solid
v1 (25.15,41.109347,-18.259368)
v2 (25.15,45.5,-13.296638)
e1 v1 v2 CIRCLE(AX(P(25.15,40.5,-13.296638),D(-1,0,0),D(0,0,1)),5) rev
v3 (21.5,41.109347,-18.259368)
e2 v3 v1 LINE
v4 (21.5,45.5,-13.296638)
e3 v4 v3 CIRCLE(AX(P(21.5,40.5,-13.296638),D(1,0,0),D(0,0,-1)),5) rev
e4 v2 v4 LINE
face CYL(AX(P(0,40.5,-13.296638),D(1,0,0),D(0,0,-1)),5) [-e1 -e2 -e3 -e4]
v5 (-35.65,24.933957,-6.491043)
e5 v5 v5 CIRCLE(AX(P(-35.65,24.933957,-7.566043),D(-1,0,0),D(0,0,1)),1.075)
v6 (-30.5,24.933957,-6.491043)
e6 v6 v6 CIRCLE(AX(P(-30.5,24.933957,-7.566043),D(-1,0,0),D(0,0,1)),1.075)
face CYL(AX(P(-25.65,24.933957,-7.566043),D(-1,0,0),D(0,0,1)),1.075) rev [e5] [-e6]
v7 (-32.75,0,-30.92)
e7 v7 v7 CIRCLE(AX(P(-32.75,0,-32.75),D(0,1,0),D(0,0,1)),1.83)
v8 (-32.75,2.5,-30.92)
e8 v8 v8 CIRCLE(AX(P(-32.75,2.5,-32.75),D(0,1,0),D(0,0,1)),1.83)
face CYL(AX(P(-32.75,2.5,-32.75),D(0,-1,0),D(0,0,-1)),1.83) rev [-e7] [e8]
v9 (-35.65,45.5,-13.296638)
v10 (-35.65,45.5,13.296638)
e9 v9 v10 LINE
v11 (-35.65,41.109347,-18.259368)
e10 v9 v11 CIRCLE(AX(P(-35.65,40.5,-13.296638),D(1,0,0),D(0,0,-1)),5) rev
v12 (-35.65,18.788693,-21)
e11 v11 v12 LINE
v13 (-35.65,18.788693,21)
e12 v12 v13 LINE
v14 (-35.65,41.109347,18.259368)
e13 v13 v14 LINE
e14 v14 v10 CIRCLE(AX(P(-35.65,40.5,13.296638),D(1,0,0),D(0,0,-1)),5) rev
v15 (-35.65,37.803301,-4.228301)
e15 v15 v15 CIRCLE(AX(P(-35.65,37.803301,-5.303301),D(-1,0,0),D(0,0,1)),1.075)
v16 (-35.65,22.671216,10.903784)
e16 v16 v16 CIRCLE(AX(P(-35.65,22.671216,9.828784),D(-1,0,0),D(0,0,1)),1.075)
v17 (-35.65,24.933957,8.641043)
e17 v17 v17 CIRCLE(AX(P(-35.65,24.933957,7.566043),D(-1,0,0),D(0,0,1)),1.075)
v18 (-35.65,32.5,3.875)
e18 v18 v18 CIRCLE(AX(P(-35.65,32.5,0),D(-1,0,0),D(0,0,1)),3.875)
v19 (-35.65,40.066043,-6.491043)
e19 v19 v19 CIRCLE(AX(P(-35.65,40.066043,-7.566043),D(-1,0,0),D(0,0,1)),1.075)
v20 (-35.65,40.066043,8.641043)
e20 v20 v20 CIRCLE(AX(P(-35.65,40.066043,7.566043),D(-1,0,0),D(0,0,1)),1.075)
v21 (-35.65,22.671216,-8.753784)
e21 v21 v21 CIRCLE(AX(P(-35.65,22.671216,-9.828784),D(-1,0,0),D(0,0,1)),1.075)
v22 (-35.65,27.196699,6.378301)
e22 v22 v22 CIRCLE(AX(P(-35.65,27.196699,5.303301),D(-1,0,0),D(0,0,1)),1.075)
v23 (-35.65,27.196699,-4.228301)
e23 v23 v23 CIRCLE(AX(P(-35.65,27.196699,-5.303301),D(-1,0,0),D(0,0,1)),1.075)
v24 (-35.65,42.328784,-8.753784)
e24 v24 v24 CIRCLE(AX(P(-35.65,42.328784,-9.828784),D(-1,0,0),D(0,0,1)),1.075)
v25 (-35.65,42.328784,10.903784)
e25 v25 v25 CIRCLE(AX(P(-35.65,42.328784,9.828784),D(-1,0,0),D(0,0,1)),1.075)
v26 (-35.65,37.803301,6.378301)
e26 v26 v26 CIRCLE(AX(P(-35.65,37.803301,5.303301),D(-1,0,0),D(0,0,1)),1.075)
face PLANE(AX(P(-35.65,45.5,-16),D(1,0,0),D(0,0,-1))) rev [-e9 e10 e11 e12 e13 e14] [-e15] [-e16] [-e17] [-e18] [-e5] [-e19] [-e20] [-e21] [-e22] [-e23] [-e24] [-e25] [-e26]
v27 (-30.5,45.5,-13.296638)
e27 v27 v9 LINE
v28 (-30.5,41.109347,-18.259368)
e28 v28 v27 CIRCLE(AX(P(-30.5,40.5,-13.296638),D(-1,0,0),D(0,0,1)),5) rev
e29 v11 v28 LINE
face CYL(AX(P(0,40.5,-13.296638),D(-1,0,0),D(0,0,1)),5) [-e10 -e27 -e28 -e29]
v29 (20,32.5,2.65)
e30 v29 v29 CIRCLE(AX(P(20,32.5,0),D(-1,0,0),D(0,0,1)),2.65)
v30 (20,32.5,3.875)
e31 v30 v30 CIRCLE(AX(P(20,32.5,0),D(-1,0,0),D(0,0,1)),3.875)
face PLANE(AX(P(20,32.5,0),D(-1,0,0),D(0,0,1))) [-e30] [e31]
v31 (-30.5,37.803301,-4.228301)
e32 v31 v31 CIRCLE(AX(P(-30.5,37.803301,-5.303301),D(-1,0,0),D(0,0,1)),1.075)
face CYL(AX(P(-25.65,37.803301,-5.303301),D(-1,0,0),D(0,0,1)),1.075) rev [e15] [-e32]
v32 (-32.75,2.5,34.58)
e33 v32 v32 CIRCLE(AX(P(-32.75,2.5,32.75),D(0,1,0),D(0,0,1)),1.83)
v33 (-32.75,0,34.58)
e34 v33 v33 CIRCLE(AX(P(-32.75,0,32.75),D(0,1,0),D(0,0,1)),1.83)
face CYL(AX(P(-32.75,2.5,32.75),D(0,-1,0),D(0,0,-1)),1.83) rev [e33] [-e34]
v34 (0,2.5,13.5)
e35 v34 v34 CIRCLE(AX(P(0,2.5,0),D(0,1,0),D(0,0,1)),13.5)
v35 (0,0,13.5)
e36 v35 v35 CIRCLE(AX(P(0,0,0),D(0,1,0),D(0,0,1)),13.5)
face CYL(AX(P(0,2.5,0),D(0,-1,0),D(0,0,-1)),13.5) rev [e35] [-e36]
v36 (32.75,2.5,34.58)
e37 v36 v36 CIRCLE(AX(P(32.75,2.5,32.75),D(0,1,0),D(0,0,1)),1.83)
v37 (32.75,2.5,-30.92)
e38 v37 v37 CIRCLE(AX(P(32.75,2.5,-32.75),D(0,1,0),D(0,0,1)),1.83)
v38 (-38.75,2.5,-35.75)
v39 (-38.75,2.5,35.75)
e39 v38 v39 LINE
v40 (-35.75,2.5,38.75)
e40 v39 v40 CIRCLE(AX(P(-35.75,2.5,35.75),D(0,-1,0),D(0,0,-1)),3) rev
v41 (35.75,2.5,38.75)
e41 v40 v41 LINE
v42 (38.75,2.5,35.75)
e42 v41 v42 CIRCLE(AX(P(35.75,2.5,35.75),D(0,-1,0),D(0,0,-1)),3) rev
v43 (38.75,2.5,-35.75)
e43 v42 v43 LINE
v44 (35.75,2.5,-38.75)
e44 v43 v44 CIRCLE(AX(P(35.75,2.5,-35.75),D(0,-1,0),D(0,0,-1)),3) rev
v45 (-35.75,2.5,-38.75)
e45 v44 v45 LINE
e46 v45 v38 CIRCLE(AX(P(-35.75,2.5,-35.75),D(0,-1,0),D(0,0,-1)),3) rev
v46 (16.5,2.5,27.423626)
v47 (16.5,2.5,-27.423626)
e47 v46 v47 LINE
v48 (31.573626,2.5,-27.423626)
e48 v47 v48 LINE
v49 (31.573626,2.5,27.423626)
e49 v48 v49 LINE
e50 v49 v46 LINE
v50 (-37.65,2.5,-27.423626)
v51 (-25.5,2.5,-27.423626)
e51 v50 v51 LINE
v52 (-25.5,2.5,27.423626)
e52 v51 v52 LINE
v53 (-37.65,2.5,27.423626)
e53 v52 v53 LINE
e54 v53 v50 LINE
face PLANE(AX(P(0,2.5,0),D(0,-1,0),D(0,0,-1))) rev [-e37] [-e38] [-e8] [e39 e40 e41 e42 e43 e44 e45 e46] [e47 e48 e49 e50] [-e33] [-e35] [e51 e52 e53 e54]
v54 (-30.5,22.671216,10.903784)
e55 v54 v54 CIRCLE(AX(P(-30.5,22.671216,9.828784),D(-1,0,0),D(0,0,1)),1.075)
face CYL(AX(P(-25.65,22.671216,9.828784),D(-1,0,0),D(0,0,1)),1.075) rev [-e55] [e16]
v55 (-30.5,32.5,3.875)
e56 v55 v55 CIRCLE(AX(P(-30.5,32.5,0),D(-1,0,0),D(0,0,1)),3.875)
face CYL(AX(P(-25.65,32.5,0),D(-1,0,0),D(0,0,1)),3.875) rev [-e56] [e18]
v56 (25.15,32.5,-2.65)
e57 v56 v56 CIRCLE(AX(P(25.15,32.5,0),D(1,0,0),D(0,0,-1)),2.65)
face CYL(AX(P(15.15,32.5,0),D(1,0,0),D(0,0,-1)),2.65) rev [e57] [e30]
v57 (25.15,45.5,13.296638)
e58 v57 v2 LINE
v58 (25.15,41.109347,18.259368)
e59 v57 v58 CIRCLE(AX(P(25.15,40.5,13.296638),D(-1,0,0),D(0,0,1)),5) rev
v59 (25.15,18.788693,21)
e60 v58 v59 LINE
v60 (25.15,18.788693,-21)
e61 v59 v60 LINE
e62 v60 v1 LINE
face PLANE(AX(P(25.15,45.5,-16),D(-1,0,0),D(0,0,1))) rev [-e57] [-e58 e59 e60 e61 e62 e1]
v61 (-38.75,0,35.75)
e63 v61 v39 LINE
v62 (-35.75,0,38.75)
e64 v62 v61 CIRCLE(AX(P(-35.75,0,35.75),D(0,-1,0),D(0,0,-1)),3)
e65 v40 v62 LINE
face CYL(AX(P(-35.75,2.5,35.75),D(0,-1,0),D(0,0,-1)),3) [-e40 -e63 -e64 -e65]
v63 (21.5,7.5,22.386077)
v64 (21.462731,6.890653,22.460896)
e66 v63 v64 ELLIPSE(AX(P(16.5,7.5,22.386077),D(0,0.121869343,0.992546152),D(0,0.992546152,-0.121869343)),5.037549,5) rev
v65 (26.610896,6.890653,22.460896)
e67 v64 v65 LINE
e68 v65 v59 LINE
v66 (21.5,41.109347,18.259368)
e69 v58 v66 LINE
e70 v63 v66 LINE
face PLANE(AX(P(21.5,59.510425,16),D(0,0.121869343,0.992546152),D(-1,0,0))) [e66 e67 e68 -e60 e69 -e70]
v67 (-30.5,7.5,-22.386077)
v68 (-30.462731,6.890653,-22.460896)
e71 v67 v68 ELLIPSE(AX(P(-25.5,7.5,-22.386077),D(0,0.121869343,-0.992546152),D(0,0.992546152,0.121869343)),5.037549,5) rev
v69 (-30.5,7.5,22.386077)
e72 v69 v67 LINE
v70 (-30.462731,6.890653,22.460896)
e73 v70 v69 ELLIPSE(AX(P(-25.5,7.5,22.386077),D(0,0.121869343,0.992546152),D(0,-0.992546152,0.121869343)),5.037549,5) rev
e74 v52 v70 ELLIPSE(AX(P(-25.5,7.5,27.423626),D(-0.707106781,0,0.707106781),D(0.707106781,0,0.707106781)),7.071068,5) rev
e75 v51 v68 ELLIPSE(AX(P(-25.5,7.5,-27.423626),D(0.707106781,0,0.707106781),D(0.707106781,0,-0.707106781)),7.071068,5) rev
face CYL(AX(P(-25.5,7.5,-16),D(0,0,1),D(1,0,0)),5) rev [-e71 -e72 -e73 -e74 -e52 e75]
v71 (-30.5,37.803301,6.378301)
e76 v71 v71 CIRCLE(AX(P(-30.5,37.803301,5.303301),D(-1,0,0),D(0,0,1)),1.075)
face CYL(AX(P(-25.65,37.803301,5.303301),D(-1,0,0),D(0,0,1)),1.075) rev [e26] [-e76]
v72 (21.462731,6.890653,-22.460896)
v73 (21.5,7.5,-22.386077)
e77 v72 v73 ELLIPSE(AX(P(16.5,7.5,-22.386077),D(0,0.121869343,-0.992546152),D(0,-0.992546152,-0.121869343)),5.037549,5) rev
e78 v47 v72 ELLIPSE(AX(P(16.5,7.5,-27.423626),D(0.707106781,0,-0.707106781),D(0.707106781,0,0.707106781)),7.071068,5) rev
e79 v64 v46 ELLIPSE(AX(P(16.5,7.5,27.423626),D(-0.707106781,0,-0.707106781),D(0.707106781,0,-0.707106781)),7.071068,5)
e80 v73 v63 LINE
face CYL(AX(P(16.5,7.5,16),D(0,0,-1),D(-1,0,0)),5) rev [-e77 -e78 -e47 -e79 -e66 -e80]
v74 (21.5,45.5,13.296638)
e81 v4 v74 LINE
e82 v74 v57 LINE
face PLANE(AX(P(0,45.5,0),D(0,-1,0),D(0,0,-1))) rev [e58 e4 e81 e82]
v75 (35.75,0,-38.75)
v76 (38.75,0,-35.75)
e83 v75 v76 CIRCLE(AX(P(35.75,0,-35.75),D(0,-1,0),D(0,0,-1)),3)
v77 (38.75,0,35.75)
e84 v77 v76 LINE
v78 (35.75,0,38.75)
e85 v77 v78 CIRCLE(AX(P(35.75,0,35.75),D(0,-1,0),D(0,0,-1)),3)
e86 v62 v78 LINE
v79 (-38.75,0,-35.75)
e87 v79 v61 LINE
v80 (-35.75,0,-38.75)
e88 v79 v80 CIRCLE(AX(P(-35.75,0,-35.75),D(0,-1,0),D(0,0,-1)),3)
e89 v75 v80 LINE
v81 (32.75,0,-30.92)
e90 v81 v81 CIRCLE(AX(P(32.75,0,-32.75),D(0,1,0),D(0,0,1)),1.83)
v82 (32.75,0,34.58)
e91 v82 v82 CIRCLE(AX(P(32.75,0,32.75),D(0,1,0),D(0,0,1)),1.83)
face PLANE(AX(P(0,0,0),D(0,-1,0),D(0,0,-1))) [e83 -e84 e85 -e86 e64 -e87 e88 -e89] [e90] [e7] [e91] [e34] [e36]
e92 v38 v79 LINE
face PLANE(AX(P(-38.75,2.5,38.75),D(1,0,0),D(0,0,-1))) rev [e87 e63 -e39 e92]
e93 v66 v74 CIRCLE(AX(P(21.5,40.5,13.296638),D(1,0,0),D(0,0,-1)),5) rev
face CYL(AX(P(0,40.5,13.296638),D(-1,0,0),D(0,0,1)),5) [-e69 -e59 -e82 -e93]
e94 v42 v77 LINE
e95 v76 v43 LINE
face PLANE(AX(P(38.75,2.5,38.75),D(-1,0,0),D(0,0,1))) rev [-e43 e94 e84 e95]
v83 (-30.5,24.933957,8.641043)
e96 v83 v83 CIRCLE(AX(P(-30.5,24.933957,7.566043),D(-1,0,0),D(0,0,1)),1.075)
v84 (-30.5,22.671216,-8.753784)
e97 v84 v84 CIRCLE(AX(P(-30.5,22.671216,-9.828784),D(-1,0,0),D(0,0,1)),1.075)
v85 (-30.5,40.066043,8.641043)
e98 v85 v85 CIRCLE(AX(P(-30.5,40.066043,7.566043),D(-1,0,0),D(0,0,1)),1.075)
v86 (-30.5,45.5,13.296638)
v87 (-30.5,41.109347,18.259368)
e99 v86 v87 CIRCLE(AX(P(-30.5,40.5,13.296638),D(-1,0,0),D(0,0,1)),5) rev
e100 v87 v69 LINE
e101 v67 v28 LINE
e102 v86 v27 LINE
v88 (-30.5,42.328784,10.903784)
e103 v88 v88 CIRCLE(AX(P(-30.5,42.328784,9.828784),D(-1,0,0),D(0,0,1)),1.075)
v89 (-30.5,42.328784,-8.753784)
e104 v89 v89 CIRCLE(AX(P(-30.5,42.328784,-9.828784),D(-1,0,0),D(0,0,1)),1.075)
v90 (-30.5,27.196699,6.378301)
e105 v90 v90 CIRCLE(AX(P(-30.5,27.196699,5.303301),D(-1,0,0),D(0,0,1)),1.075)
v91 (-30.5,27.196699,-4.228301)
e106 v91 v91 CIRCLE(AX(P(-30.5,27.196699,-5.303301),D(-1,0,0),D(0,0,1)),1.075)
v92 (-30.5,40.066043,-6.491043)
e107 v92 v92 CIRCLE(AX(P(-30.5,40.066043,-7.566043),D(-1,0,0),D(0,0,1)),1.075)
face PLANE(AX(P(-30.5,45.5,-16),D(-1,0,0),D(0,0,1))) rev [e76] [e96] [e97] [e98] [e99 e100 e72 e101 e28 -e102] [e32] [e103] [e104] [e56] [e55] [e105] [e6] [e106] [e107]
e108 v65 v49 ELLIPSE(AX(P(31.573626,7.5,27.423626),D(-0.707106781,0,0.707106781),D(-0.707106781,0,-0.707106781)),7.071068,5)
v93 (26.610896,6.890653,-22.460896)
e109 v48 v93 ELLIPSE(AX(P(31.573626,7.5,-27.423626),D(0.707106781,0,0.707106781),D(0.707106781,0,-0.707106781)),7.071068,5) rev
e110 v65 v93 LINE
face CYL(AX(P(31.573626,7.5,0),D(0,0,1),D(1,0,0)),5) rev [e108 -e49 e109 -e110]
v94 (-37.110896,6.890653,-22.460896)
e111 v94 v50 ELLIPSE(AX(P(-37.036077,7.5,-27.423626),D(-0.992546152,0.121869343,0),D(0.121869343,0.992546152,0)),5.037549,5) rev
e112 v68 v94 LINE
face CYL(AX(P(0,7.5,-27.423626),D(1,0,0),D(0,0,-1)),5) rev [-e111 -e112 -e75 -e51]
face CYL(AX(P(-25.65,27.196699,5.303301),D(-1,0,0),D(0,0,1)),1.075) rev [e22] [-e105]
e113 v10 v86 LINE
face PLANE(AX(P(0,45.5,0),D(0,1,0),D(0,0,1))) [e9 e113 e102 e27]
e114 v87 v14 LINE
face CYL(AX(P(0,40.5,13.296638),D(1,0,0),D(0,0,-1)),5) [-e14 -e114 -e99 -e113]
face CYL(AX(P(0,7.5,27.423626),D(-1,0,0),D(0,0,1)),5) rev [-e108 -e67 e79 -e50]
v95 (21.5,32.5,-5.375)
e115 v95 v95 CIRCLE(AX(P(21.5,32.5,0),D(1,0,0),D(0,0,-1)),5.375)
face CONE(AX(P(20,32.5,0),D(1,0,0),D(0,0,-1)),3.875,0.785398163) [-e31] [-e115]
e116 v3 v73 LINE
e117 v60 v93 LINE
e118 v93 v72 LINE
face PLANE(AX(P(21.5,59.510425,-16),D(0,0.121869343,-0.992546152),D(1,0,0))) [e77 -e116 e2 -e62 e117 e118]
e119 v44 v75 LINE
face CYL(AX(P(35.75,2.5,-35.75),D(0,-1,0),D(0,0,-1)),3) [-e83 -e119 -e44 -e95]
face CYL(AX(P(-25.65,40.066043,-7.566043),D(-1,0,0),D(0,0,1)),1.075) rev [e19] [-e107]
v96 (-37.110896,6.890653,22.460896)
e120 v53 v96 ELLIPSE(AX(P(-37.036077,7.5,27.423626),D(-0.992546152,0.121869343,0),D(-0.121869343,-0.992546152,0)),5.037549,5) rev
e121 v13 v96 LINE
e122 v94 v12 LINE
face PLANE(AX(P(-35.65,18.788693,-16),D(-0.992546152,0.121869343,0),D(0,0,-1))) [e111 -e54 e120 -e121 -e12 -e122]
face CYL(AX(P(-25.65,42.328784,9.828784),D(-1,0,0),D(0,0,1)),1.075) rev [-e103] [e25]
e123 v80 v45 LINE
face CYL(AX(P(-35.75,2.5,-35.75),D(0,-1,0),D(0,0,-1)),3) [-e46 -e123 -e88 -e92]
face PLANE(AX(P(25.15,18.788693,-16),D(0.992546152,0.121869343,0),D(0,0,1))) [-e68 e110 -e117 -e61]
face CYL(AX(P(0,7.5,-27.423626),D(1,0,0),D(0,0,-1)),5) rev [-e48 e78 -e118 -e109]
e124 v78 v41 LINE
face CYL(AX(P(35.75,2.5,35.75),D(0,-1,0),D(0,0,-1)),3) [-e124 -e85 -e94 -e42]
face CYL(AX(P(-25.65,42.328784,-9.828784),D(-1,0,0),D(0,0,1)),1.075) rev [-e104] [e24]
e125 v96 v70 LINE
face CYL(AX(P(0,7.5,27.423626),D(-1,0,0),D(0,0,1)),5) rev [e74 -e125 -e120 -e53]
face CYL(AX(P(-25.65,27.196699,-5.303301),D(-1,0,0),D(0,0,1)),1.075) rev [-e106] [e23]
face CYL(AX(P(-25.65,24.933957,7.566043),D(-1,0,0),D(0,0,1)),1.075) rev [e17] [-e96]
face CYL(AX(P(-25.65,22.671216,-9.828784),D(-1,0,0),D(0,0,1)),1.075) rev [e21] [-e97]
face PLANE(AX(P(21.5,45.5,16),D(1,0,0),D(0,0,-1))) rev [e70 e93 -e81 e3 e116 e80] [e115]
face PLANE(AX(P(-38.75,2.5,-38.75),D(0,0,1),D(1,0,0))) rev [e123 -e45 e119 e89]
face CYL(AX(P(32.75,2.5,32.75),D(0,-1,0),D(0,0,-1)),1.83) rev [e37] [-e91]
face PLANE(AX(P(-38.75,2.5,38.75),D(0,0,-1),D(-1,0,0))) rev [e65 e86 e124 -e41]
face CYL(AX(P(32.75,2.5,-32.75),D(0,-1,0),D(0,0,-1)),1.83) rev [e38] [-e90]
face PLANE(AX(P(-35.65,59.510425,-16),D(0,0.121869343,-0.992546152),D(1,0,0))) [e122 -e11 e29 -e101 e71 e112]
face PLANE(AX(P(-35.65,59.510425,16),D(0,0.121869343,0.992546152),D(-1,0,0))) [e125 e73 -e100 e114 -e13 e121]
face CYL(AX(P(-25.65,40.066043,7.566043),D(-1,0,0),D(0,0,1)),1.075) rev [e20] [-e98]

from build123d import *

# Parameters (mm, degrees)
SKETCH1_W           = 77.5
SKETCH1_H           = 77.5
SKETCH1_R           = 1.83
SKETCH1_R_2         = 13.5
BOSS_EXTRUDE1_DEPTH = 2.5
FILLET1_R           = 3
SKETCH2_W           = 5.15
SKETCH2_H           = 32
SKETCH2_W_2         = 3.65
BOSS_EXTRUDE2_DEPTH = 43
SKETCH3_R           = 3.875
SKETCH3_R_2         = 1.075
CUT_EXTRUDE1_DEPTH  = 10
SKETCH4_R           = 2.65
CUT_EXTRUDE2_DEPTH  = 10
SKETCH5_R           = 3.875
SKETCH5_R_2         = 2.65
BOSS_EXTRUDE3_DEPTH = 1.5
CHAMFER1_SIZE       = 1.5
CHAMFER2_SIZE       = 57.010424996
CHAMFER2_SIZE_2     = 7
CHAMFER3_SIZE       = 2
CHAMFER3_SIZE2      = 16.288692856
FILLET2_R           = 5


# Some blends are built 0.0001 mm under size
with BuildPart() as part:
    # Sketch1 → Boss-Extrude1 (new body)
    with BuildSketch(Plane(origin=(0, 0, 0), x_dir=(1, 0, 0), z_dir=(0, 1, 0))):
        Rectangle(SKETCH1_W, SKETCH1_H)
        with Locations(Location((32.75, 32.75, 0), (0, 0, 270))):
            Circle(SKETCH1_R, mode=Mode.SUBTRACT)
        with Locations(Location((32.75, -32.75, 0), (0, 0, 270))):
            Circle(SKETCH1_R, mode=Mode.SUBTRACT)
        with Locations(Location((-32.75, -32.75, 0), (0, 0, 270))):
            Circle(SKETCH1_R, mode=Mode.SUBTRACT)
        with Locations(Location((-32.75, 32.75, 0), (0, 0, 270))):
            Circle(SKETCH1_R, mode=Mode.SUBTRACT)
        with Locations(Location((0, 0, 0), (0, 0, 270))):
            Circle(SKETCH1_R_2, mode=Mode.SUBTRACT)
    extrude(amount=BOSS_EXTRUDE1_DEPTH)

    # Fillet1
    fillet1_edges = [part.edges().sort_by_distance(p)[0] for p in [
        (38.75, 1.25, 38.75),
        (-38.75, 1.25, 38.75),
        (-38.75, 1.25, -38.75),
        (38.75, 1.25, -38.75),
    ]]
    fillet(fillet1_edges, radius=FILLET1_R)

    # Sketch2 → Boss-Extrude2 (add)
    with BuildSketch(Plane(origin=(0, 2.5, 0), x_dir=(1, 0, 0), z_dir=(0, 1, 0))):
        with Locations((-33.075, 0)):
            Rectangle(SKETCH2_W, SKETCH2_H)
        with Locations((23.325, 0)):
            Rectangle(SKETCH2_W_2, SKETCH2_H)
    extrude(amount=BOSS_EXTRUDE2_DEPTH)

    # Sketch3 → Cut-Extrude1 (cut)
    with BuildSketch(Plane.ZY.offset(35.65)):
        with Locations((0, 32.5)):
            Circle(SKETCH3_R)
        with Locations((-5.303300859, 37.803300859)):
            Circle(SKETCH3_R_2)
        with Locations((5.303300859, 37.803300859)):
            Circle(SKETCH3_R_2)
        with Locations((5.303300859, 27.196699141)):
            Circle(SKETCH3_R_2)
        with Locations((-5.303300859, 27.196699141)):
            Circle(SKETCH3_R_2)
        with Locations((-7.566042559, 40.066042559)):
            Circle(SKETCH3_R_2)
        with Locations((-9.828784258, 42.328784258)):
            Circle(SKETCH3_R_2)
        with Locations((9.828784258, 42.328784258)):
            Circle(SKETCH3_R_2)
        with Locations((7.566042559, 40.066042559)):
            Circle(SKETCH3_R_2)
        with Locations((9.828784258, 22.671215742)):
            Circle(SKETCH3_R_2)
        with Locations((7.566042559, 24.933957441)):
            Circle(SKETCH3_R_2)
        with Locations((-9.828784258, 22.671215742)):
            Circle(SKETCH3_R_2)
        with Locations((-7.566042559, 24.933957441)):
            Circle(SKETCH3_R_2)
    extrude(amount=-CUT_EXTRUDE1_DEPTH, mode=Mode.SUBTRACT)

    # Sketch4 → Cut-Extrude2 (cut)
    with BuildSketch(Plane(origin=(25.15, 0, 0), x_dir=(0, 0, -1), z_dir=(1, 0, 0))):
        with Locations((0, 32.5)):
            Circle(SKETCH4_R)
    extrude(amount=-CUT_EXTRUDE2_DEPTH, mode=Mode.SUBTRACT)

    # Sketch5 → Boss-Extrude3 (add)
    with BuildSketch(Plane.ZY.offset(-21.5)):
        with Locations((0, 32.5)):
            Circle(SKETCH5_R)
        with Locations(Location((0, 32.5, 0), (0, 0, 180))):
            Circle(SKETCH5_R_2, mode=Mode.SUBTRACT)
    extrude(amount=BOSS_EXTRUDE3_DEPTH)

    # Chamfer1
    chamfer1_edges = [part.edges().sort_by_distance(p)[0] for p in [
        (21.5, 32.5, -3.875),
    ]]
    chamfer(chamfer1_edges, length=CHAMFER1_SIZE - 0.0001)  # a hair under: the kernel refuses the full size

    # Chamfer2
    # the kernel refuses this chamfer: 57.010424996, 7 mm, written as the material it adds along each edge
    with BuildSketch(Plane(origin=(25.15, 2.5, 16), x_dir=(0, 0.9999890085715016, -0.004688575069790725), z_dir=(-1, 0, 0))) as chamfer2_piece_1_section:
        Polygon((CHAMFER2_SIZE * 0.999989008568, -CHAMFER2_SIZE * 0.00468857506978), (-CHAMFER2_SIZE_2 * 0.00468857506979, -CHAMFER2_SIZE_2 * 0.999989008572), (0, 0), align=None)
    chamfer2_piece_1 = extrude(amount=3.65, mode=Mode.PRIVATE)
    chamfer2_piece_1 = split(chamfer2_piece_1, bisect_by=Plane(origin=(23.325, 45.5, 17.927649929), z_dir=(0, -1, 0)), keep=Keep.TOP, mode=Mode.PRIVATE)
    add(chamfer2_piece_1)
    with BuildSketch(Plane(origin=(25.15, 2.5, 16), x_dir=(0, 0.9999890085715016, -0.004688575069790725), z_dir=(-1, 0, 0))) as chamfer2_piece_2_section:
        Polygon((CHAMFER2_SIZE * 0.999989008568, -CHAMFER2_SIZE * 0.00468857506978), (-CHAMFER2_SIZE_2 * 0.00468857506979, -CHAMFER2_SIZE_2 * 0.999989008572), (0, 0), align=None)
    chamfer2_piece_2 = extrude(amount=151.836239061, mode=Mode.PRIVATE)
    chamfer2_piece_2 = split(chamfer2_piece_2, bisect_by=Plane(origin=(-33.075, 45.5, 17.927649929), z_dir=(0, -1, 0)), keep=Keep.TOP, mode=Mode.PRIVATE)
    chamfer2_piece_2 = split(chamfer2_piece_2, bisect_by=Plane(origin=(-35.65, 19.754331074, 17.927649929), z_dir=(1, 0, 0)), keep=Keep.TOP, mode=Mode.PRIVATE)
    chamfer2_piece_2 = split(chamfer2_piece_2, bisect_by=Plane(origin=(-30.5, 19.754331074, 17.927649929), z_dir=(-1, 0, 0)), keep=Keep.TOP, mode=Mode.PRIVATE)
    add(chamfer2_piece_2)
    with BuildSketch(Plane(origin=(117.686239061, 2.5, 16), x_dir=(0, -0.29696840376136574, 0.9548873060039212), z_dir=(-1, 0, 0))) as chamfer2_piece_3_section:
        Polygon((CHAMFER2_SIZE_2 * 0.954887306004, CHAMFER2_SIZE_2 * 0.296968403761), (-CHAMFER2_SIZE * 0.29696840376, CHAMFER2_SIZE * 0.954887306001), (0, 0), align=None)
    chamfer2_piece_3 = extrude(amount=153.336239061, mode=Mode.PRIVATE)
    chamfer2_piece_3 = split(chamfer2_piece_3, bisect_by=Plane(origin=(21.5, 19.754331074, 17.927649929), z_dir=(1, 0, 0)), keep=Keep.TOP, mode=Mode.PRIVATE)
    chamfer2_piece_3 = split(chamfer2_piece_3, bisect_by=Plane(origin=(25.15, 19.754331074, 17.927649929), z_dir=(-1, 0, 0)), keep=Keep.TOP, mode=Mode.PRIVATE)
    chamfer2_piece_3 = split(chamfer2_piece_3, bisect_by=Plane(origin=(23.325, 45.5, 17.927649929), z_dir=(0, -1, 0)), keep=Keep.TOP, mode=Mode.PRIVATE)
    add(chamfer2_piece_3)
    with BuildSketch(Plane(origin=(-30.5, 2.5, 16), x_dir=(0, -0.29696840376136574, 0.9548873060039212), z_dir=(-1, 0, 0))) as chamfer2_piece_4_section:
        Polygon((CHAMFER2_SIZE_2 * 0.954887306004, CHAMFER2_SIZE_2 * 0.296968403761), (-CHAMFER2_SIZE * 0.29696840376, CHAMFER2_SIZE * 0.954887306001), (0, 0), align=None)
    chamfer2_piece_4 = extrude(amount=5.15, mode=Mode.PRIVATE)
    chamfer2_piece_4 = split(chamfer2_piece_4, bisect_by=Plane(origin=(-33.075, 45.5, 17.927649929), z_dir=(0, -1, 0)), keep=Keep.TOP, mode=Mode.PRIVATE)
    add(chamfer2_piece_4)
    with BuildSketch(Plane(origin=(-35.65, 2.5, -16), x_dir=(0, -0.29696840376136574, -0.9548873060039212), z_dir=(1, 0, 0))) as chamfer2_piece_5_section:
        Polygon((CHAMFER2_SIZE_2 * 0.954887306004, CHAMFER2_SIZE_2 * 0.296968403761), (-CHAMFER2_SIZE * 0.29696840376, CHAMFER2_SIZE * 0.954887306001), (0, 0), align=None)
    chamfer2_piece_5 = extrude(amount=5.15, mode=Mode.PRIVATE)
    chamfer2_piece_5 = split(chamfer2_piece_5, bisect_by=Plane(origin=(-33.075, 45.5, -17.927649929), z_dir=(0, -1, 0)), keep=Keep.TOP, mode=Mode.PRIVATE)
    add(chamfer2_piece_5)
    with BuildSketch(Plane(origin=(-35.65, 2.5, -16), x_dir=(0, -0.29696840376136574, -0.9548873060039212), z_dir=(1, 0, 0))) as chamfer2_piece_6_section:
        Polygon((CHAMFER2_SIZE_2 * 0.954887306004, CHAMFER2_SIZE_2 * 0.296968403761), (-CHAMFER2_SIZE * 0.29696840376, CHAMFER2_SIZE * 0.954887306001), (0, 0), align=None)
    chamfer2_piece_6 = extrude(amount=153.336239061, mode=Mode.PRIVATE)
    chamfer2_piece_6 = split(chamfer2_piece_6, bisect_by=Plane(origin=(21.5, 19.754331074, -17.927649929), z_dir=(1, 0, 0)), keep=Keep.TOP, mode=Mode.PRIVATE)
    chamfer2_piece_6 = split(chamfer2_piece_6, bisect_by=Plane(origin=(23.325, 45.5, -17.927649929), z_dir=(0, -1, 0)), keep=Keep.TOP, mode=Mode.PRIVATE)
    chamfer2_piece_6 = split(chamfer2_piece_6, bisect_by=Plane(origin=(25.15, 19.754331074, -17.927649929), z_dir=(-1, 0, 0)), keep=Keep.TOP, mode=Mode.PRIVATE)
    add(chamfer2_piece_6)
    with BuildSketch(Plane(origin=(-126.686239061, 2.5, -16), x_dir=(0, -0.29696840376136574, -0.9548873060039212), z_dir=(1, 0, 0))) as chamfer2_piece_7_section:
        Polygon((CHAMFER2_SIZE_2 * 0.954887306004, CHAMFER2_SIZE_2 * 0.296968403761), (-CHAMFER2_SIZE * 0.29696840376, CHAMFER2_SIZE * 0.954887306001), (0, 0), align=None)
    chamfer2_piece_7 = extrude(amount=151.836239061, mode=Mode.PRIVATE)
    chamfer2_piece_7 = split(chamfer2_piece_7, bisect_by=Plane(origin=(-33.075, 45.5, -17.927649929), z_dir=(0, -1, 0)), keep=Keep.TOP, mode=Mode.PRIVATE)
    chamfer2_piece_7 = split(chamfer2_piece_7, bisect_by=Plane(origin=(-35.65, 19.754331074, -17.927649929), z_dir=(1, 0, 0)), keep=Keep.TOP, mode=Mode.PRIVATE)
    chamfer2_piece_7 = split(chamfer2_piece_7, bisect_by=Plane(origin=(-30.5, 19.754331074, -17.927649929), z_dir=(-1, 0, 0)), keep=Keep.TOP, mode=Mode.PRIVATE)
    add(chamfer2_piece_7)
    with BuildSketch(Plane(origin=(21.5, 2.5, -16), x_dir=(0, -0.29696840376136574, -0.9548873060039212), z_dir=(1, 0, 0))) as chamfer2_piece_8_section:
        Polygon((CHAMFER2_SIZE_2 * 0.954887306004, CHAMFER2_SIZE_2 * 0.296968403761), (-CHAMFER2_SIZE * 0.29696840376, CHAMFER2_SIZE * 0.954887306001), (0, 0), align=None)
    chamfer2_piece_8 = extrude(amount=3.65, mode=Mode.PRIVATE)
    chamfer2_piece_8 = split(chamfer2_piece_8, bisect_by=Plane(origin=(23.325, 45.5, -17.927649929), z_dir=(0, -1, 0)), keep=Keep.TOP, mode=Mode.PRIVATE)
    add(chamfer2_piece_8)

    # Chamfer3
    chamfer3_edges = [part.edges().sort_by_distance(p)[0] for p in [
        (-35.65, 2.5, 0),
        (25.15, 2.5, 0),
    ]]
    chamfer3_side = [part.faces().sort_by_distance(p)[0] for p in [
        (0, 2.5, 37.653984489),
    ]]
    chamfer(chamfer3_edges, length=CHAMFER3_SIZE, length2=CHAMFER3_SIZE2, reference=chamfer3_side[0])

    # Fillet2
    fillet2_edges = [part.edges().sort_by_distance(p)[0] for p in [
        (24.325, 2.5, -23),
        (-34.075, 2.5, -23),
        (-34.075, 2.5, 23),
        (24.325, 2.5, 23),
        (23.325, 45.5, 17.720263881),
        (-33.075, 45.5, 17.720263881),
        (-33.075, 45.5, -17.720263881),
        (23.325, 45.5, -17.720263881),
        (27.15, 2.5, 0),
        (-30.5, 2.5, 0),
        (21.5, 2.5, 0),
    ]]
    fillet(fillet2_edges, radius=FILLET2_R)


solid = part.part
